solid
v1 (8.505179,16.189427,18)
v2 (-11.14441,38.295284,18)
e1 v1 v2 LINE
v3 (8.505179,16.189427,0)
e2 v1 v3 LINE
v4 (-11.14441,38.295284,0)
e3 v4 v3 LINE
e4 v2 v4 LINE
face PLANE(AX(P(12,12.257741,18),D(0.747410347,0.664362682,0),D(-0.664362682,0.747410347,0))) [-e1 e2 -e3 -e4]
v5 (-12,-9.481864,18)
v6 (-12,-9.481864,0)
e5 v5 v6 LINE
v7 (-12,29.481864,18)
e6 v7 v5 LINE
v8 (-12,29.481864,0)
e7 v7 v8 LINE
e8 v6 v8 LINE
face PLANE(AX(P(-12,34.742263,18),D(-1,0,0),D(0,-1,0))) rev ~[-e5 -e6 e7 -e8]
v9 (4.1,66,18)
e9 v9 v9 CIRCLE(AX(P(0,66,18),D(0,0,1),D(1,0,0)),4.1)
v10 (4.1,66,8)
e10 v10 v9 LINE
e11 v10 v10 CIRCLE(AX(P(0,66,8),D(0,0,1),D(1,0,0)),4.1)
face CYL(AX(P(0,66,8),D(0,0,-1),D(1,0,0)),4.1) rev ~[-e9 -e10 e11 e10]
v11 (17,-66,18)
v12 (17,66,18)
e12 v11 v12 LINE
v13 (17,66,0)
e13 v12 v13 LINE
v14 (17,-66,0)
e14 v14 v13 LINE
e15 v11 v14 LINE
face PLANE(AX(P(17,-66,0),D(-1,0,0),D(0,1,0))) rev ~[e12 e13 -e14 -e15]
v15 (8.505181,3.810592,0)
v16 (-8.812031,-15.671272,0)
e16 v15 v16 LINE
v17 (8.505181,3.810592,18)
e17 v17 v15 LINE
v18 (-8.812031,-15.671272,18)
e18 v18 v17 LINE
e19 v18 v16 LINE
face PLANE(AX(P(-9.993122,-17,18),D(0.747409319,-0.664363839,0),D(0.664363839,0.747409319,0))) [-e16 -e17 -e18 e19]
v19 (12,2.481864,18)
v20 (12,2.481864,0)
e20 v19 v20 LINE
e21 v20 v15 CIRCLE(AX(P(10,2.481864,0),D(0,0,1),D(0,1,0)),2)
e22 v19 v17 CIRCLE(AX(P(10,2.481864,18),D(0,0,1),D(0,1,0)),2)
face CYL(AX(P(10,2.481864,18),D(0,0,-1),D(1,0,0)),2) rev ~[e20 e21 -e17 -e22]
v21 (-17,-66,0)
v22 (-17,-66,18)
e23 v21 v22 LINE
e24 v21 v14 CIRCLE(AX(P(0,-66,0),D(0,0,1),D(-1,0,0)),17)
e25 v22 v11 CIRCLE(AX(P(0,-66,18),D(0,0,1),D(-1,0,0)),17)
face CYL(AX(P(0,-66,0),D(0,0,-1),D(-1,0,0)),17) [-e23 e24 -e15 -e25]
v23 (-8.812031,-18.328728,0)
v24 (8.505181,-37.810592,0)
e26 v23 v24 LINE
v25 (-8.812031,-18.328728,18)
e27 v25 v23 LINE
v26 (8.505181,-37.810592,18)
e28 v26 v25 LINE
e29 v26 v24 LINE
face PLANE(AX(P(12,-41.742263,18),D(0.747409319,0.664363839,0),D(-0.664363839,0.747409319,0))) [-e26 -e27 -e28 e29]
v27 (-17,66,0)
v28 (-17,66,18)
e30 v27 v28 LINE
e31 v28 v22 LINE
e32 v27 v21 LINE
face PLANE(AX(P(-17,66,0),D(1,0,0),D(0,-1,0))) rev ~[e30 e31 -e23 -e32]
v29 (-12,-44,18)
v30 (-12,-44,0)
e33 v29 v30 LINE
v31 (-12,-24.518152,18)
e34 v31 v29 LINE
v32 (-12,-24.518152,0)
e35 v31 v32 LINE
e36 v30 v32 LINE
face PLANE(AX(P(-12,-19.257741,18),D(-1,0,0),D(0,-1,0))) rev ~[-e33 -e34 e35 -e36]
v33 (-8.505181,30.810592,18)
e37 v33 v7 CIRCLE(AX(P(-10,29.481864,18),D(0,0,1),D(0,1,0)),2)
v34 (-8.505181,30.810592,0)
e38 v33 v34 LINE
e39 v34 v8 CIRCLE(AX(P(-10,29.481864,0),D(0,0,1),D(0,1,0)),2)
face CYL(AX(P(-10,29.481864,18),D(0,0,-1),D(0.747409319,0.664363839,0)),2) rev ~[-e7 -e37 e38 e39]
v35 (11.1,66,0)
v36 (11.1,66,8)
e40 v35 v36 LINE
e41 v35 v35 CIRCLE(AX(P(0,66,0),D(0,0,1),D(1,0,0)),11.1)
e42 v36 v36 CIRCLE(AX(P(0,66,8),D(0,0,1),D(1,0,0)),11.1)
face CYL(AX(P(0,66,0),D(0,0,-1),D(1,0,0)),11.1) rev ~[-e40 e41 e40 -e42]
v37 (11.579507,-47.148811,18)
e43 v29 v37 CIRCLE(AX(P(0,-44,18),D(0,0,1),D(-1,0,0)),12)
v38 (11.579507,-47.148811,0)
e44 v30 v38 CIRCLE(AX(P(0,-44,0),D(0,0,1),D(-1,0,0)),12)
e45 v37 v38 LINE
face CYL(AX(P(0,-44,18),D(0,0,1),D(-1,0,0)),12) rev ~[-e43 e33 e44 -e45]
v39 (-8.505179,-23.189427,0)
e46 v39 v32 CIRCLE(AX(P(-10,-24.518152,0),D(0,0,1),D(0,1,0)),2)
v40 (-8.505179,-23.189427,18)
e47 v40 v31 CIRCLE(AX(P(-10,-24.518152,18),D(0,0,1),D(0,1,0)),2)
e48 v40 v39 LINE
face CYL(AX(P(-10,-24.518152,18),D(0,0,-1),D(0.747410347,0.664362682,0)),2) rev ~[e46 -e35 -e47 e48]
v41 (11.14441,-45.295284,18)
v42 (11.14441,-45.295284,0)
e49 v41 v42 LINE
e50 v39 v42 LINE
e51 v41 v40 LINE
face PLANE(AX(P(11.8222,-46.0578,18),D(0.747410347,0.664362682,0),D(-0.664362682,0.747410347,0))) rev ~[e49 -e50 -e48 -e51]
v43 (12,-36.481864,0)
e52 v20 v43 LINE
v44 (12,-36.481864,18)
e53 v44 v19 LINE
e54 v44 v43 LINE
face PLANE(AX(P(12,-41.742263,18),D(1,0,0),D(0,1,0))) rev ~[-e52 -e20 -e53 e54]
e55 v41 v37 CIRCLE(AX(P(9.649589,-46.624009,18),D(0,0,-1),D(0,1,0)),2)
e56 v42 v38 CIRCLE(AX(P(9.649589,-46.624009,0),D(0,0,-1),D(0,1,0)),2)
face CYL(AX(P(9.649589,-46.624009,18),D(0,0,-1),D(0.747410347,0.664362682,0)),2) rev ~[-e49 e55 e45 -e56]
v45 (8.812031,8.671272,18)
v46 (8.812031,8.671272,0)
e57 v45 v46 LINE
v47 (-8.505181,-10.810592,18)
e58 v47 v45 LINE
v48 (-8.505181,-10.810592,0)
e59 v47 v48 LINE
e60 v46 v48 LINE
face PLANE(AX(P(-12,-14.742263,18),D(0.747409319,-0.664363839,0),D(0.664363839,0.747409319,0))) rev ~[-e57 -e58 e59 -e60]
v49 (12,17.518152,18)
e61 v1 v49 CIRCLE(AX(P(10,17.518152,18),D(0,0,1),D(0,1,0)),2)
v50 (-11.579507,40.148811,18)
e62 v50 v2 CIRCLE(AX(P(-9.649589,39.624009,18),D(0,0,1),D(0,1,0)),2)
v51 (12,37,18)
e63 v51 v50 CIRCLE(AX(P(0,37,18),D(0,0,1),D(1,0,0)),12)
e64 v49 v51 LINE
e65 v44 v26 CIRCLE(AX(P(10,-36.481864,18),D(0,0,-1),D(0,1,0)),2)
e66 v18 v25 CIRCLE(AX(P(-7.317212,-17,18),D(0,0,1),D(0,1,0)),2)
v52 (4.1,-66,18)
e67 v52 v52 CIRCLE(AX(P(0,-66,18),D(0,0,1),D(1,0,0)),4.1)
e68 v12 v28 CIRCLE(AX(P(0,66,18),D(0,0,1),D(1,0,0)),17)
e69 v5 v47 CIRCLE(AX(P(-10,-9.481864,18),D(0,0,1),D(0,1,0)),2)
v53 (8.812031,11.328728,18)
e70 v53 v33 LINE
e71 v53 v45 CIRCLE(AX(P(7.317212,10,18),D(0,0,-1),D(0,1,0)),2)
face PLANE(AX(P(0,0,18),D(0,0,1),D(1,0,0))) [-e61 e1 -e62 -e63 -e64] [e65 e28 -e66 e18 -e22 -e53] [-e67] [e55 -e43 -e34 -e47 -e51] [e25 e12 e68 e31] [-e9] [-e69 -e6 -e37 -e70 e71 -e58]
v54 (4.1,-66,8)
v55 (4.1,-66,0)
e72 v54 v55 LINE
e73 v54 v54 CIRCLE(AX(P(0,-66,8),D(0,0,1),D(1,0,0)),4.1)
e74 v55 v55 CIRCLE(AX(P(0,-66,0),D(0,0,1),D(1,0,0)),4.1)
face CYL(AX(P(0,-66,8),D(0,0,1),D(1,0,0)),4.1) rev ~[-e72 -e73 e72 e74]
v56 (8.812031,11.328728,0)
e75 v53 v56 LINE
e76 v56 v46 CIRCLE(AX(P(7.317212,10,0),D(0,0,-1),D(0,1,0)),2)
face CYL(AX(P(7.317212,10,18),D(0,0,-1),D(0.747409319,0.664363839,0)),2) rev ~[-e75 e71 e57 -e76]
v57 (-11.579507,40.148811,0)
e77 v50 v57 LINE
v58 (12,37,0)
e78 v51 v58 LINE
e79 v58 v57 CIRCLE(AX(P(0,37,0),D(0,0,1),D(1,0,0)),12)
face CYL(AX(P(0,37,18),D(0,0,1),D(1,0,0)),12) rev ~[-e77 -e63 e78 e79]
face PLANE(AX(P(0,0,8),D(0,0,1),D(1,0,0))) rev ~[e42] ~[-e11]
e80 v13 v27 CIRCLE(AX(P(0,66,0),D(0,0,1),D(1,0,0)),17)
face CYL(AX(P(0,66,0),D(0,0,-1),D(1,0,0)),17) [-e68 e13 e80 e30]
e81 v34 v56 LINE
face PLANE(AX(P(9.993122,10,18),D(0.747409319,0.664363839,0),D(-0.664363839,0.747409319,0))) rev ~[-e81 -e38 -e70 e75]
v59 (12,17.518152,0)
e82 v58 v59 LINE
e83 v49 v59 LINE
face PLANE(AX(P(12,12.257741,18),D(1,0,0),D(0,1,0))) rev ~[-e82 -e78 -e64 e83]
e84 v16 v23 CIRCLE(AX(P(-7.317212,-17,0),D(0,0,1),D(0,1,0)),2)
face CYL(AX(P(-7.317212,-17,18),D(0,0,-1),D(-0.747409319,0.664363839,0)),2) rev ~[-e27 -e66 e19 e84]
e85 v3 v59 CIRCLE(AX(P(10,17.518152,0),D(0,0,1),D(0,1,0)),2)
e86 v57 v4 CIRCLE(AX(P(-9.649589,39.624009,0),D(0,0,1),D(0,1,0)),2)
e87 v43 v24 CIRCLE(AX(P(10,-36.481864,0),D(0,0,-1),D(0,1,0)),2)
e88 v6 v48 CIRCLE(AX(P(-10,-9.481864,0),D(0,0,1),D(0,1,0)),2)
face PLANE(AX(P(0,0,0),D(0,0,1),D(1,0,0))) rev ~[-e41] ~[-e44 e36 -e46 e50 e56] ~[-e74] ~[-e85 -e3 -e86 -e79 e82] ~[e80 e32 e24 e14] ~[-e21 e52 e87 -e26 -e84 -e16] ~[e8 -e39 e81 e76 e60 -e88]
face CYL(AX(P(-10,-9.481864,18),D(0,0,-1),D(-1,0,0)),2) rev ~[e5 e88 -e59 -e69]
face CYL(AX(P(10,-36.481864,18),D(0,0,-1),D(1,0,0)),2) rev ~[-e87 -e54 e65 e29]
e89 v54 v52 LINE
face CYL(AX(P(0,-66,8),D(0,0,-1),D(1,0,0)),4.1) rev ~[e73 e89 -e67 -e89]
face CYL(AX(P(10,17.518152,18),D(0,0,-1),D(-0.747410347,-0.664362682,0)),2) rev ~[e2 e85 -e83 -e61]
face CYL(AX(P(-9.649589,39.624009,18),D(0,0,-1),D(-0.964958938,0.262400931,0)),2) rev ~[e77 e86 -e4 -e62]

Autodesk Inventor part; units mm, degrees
ref_plane "YZ Plane" through (0, 0, 0) normal (1, 0, 0) x (0, 1, 0)
ref_plane "XZ Plane" through (0, 0, 0) normal (0, 1, 0) x (-1, 0, 0)
ref_plane "XY Plane" through (0, 0, 0) normal (0, 0, 1) x (1, 0, 0)
sketch "Sketch1" plane through (0, 0, 0) normal (0, 0, 1) x (1, 0, 0)
  line L0 (0, 66) -> (0, -66) construction
  line L1 (-17, 66) -> (-17, -66)
  line L2 (17, -66) -> (17, 66)
  arc A0 (17, 66) -> (-17, 66) centre (0, 66) ccw
  arc A1 (-17, -66) -> (17, -66) centre (0, -66) ccw
  circle A2 centre (0, -66) radius 1.1
  circle A3 centre (0, 66) radius 11.1
  point P0 (0, 0)
  dimension "d0" = 66
  dimension "d1" = 34
  dimension "d2" = 2.2
  dimension "d3" = 22.2
  dimension "d40" = 17
extrude "Extrusion1" add sketch "Sketch1" along normal blind 8
sketch "Sketch2" plane through (0, 0, 8) normal (0, 0, 1) x (1, 0, 0)
  arc A0 (-17, -66) -> (17, -66) centre (0, -66) ccw projected
  line L0 (17, -66) -> (17, 66) projected
  arc A1 (17, 66) -> (-17, 66) centre (0, 66) ccw projected
  line L1 (-17, 66) -> (-17, -66) projected
  circle A2 centre (0, 66) radius 11.1 projected
  circle A3 centre (0, -66) radius 1.1 projected
  circle A4 centre (0, -66) radius 4.1
  circle A5 centre (0, 66) radius 4.1
  point P0 (0, 0)
  dimension "d6" = 8.2
  dimension "d12" = 8.2
extrude "Extrusion2" add sketch "Sketch2" along normal blind 10 contours L1 A1 L0 A0 | A2
sketch "Sketch3" plane through (0, 0, 18) normal (0, 0, 1) x (1, 0, 0)
  line L0 (17, -66) -> (17, 66) projected
  arc A0 (17, 66) -> (-17, 66) centre (0, 66) ccw projected
  line L1 (-17, 66) -> (-17, -66) projected
  arc A1 (-17, -66) -> (17, -66) centre (0, -66) ccw projected
  circle A2 centre (0, -66) radius 4.1 projected
  line L2 (0, 49) -> (0, -56) construction
  line L3 (-12, 37) -> (-12, -44)
  line L4 (12, -44) -> (12, 37)
  arc A3 (12, 37) -> (-12, 37) centre (0, 37) ccw
  arc A4 (-12, -44) -> (12, -44) centre (0, -44) ccw
  line L5 (-12, -44) -> (-12, -17)
  line L6 (12, 37) -> (12, 10)
  line L7 (12, -44) -> (-12, -17)
  line L8 (-12, -17) -> (12, 10)
  line L9 (12, 10) -> (-12, 37)
  line L10 (13.1211, 10.9965) -> (-11.8222, 39.0578)
  line L11 (10.8789, 9.0035) -> (-13.1211, 36.0035)
  line L12 (-13.1211, -16.0035) -> (10.8789, 10.9965)
  line L13 (11.8222, -46.0578) -> (-13.1211, -17.9965)
  line L14 (13.1211, -43.0035) -> (-10.8789, -16.0035)
  line L15 (-10.8789, -17.9965) -> (13.1211, 9.0035)
  point P0 (0, -3.5)
  point P1 (-12, -19.2578)
  point P2 (12, 7.7422)
  point P3 (-9.9931, -17)
  point P4 (12, -41.7422)
  point P5 (-12, -14.7422)
  point P6 (9.9931, 10)
  point P7 (-12, 34.7422)
  point P8 (12, 12.2578)
  dimension "d47" = 105
  dimension "d48" = 24
  dimension "d49" = 27
  dimension "d50" = 27
  dimension "d51" = 1.5
  dimension "d52" = 1.5
  dimension "d53" = 1.5
  dimension "d54" = 1.5
  dimension "d55" = 1.5
  dimension "d56" = 1.5
extrude "Extrusion3" cut sketch "Sketch3" against normal up to next contours L11 L12 L3 | A3 L4 L10 | L4 L14 L15 | L13 A4 L3
sketch "Sketch6" plane through (0, -66, 8) normal (0, 0, 1) x (1, 0, 0)
  circle A0 centre (0, 0) radius 4.1 projected
  circle A1 centre (0, 0) radius 1.1 projected
  point P0 (0, 66)
extrude "Extrusion6" cut sketch "Sketch6" against normal up to next contours A0 | A1
fillet "Fillet3" radius 2 10 edges at (-12, 34.7422, 9) (12, 12.2578, 9) (9.9931, 10, 9) (12, 7.7422, 9) (-12, -14.7422, 9) (-9.9931, -17, 9) (-12, -19.2578, 9) (12, -41.7422, 9) (11.8222, -46.0578, 9) (-11.8222, 39.0578, 9)
equation "\"d12\" = d6"
equation "\"d50\" = d49"
properties part number "CodoTrasero" material "PLA"
